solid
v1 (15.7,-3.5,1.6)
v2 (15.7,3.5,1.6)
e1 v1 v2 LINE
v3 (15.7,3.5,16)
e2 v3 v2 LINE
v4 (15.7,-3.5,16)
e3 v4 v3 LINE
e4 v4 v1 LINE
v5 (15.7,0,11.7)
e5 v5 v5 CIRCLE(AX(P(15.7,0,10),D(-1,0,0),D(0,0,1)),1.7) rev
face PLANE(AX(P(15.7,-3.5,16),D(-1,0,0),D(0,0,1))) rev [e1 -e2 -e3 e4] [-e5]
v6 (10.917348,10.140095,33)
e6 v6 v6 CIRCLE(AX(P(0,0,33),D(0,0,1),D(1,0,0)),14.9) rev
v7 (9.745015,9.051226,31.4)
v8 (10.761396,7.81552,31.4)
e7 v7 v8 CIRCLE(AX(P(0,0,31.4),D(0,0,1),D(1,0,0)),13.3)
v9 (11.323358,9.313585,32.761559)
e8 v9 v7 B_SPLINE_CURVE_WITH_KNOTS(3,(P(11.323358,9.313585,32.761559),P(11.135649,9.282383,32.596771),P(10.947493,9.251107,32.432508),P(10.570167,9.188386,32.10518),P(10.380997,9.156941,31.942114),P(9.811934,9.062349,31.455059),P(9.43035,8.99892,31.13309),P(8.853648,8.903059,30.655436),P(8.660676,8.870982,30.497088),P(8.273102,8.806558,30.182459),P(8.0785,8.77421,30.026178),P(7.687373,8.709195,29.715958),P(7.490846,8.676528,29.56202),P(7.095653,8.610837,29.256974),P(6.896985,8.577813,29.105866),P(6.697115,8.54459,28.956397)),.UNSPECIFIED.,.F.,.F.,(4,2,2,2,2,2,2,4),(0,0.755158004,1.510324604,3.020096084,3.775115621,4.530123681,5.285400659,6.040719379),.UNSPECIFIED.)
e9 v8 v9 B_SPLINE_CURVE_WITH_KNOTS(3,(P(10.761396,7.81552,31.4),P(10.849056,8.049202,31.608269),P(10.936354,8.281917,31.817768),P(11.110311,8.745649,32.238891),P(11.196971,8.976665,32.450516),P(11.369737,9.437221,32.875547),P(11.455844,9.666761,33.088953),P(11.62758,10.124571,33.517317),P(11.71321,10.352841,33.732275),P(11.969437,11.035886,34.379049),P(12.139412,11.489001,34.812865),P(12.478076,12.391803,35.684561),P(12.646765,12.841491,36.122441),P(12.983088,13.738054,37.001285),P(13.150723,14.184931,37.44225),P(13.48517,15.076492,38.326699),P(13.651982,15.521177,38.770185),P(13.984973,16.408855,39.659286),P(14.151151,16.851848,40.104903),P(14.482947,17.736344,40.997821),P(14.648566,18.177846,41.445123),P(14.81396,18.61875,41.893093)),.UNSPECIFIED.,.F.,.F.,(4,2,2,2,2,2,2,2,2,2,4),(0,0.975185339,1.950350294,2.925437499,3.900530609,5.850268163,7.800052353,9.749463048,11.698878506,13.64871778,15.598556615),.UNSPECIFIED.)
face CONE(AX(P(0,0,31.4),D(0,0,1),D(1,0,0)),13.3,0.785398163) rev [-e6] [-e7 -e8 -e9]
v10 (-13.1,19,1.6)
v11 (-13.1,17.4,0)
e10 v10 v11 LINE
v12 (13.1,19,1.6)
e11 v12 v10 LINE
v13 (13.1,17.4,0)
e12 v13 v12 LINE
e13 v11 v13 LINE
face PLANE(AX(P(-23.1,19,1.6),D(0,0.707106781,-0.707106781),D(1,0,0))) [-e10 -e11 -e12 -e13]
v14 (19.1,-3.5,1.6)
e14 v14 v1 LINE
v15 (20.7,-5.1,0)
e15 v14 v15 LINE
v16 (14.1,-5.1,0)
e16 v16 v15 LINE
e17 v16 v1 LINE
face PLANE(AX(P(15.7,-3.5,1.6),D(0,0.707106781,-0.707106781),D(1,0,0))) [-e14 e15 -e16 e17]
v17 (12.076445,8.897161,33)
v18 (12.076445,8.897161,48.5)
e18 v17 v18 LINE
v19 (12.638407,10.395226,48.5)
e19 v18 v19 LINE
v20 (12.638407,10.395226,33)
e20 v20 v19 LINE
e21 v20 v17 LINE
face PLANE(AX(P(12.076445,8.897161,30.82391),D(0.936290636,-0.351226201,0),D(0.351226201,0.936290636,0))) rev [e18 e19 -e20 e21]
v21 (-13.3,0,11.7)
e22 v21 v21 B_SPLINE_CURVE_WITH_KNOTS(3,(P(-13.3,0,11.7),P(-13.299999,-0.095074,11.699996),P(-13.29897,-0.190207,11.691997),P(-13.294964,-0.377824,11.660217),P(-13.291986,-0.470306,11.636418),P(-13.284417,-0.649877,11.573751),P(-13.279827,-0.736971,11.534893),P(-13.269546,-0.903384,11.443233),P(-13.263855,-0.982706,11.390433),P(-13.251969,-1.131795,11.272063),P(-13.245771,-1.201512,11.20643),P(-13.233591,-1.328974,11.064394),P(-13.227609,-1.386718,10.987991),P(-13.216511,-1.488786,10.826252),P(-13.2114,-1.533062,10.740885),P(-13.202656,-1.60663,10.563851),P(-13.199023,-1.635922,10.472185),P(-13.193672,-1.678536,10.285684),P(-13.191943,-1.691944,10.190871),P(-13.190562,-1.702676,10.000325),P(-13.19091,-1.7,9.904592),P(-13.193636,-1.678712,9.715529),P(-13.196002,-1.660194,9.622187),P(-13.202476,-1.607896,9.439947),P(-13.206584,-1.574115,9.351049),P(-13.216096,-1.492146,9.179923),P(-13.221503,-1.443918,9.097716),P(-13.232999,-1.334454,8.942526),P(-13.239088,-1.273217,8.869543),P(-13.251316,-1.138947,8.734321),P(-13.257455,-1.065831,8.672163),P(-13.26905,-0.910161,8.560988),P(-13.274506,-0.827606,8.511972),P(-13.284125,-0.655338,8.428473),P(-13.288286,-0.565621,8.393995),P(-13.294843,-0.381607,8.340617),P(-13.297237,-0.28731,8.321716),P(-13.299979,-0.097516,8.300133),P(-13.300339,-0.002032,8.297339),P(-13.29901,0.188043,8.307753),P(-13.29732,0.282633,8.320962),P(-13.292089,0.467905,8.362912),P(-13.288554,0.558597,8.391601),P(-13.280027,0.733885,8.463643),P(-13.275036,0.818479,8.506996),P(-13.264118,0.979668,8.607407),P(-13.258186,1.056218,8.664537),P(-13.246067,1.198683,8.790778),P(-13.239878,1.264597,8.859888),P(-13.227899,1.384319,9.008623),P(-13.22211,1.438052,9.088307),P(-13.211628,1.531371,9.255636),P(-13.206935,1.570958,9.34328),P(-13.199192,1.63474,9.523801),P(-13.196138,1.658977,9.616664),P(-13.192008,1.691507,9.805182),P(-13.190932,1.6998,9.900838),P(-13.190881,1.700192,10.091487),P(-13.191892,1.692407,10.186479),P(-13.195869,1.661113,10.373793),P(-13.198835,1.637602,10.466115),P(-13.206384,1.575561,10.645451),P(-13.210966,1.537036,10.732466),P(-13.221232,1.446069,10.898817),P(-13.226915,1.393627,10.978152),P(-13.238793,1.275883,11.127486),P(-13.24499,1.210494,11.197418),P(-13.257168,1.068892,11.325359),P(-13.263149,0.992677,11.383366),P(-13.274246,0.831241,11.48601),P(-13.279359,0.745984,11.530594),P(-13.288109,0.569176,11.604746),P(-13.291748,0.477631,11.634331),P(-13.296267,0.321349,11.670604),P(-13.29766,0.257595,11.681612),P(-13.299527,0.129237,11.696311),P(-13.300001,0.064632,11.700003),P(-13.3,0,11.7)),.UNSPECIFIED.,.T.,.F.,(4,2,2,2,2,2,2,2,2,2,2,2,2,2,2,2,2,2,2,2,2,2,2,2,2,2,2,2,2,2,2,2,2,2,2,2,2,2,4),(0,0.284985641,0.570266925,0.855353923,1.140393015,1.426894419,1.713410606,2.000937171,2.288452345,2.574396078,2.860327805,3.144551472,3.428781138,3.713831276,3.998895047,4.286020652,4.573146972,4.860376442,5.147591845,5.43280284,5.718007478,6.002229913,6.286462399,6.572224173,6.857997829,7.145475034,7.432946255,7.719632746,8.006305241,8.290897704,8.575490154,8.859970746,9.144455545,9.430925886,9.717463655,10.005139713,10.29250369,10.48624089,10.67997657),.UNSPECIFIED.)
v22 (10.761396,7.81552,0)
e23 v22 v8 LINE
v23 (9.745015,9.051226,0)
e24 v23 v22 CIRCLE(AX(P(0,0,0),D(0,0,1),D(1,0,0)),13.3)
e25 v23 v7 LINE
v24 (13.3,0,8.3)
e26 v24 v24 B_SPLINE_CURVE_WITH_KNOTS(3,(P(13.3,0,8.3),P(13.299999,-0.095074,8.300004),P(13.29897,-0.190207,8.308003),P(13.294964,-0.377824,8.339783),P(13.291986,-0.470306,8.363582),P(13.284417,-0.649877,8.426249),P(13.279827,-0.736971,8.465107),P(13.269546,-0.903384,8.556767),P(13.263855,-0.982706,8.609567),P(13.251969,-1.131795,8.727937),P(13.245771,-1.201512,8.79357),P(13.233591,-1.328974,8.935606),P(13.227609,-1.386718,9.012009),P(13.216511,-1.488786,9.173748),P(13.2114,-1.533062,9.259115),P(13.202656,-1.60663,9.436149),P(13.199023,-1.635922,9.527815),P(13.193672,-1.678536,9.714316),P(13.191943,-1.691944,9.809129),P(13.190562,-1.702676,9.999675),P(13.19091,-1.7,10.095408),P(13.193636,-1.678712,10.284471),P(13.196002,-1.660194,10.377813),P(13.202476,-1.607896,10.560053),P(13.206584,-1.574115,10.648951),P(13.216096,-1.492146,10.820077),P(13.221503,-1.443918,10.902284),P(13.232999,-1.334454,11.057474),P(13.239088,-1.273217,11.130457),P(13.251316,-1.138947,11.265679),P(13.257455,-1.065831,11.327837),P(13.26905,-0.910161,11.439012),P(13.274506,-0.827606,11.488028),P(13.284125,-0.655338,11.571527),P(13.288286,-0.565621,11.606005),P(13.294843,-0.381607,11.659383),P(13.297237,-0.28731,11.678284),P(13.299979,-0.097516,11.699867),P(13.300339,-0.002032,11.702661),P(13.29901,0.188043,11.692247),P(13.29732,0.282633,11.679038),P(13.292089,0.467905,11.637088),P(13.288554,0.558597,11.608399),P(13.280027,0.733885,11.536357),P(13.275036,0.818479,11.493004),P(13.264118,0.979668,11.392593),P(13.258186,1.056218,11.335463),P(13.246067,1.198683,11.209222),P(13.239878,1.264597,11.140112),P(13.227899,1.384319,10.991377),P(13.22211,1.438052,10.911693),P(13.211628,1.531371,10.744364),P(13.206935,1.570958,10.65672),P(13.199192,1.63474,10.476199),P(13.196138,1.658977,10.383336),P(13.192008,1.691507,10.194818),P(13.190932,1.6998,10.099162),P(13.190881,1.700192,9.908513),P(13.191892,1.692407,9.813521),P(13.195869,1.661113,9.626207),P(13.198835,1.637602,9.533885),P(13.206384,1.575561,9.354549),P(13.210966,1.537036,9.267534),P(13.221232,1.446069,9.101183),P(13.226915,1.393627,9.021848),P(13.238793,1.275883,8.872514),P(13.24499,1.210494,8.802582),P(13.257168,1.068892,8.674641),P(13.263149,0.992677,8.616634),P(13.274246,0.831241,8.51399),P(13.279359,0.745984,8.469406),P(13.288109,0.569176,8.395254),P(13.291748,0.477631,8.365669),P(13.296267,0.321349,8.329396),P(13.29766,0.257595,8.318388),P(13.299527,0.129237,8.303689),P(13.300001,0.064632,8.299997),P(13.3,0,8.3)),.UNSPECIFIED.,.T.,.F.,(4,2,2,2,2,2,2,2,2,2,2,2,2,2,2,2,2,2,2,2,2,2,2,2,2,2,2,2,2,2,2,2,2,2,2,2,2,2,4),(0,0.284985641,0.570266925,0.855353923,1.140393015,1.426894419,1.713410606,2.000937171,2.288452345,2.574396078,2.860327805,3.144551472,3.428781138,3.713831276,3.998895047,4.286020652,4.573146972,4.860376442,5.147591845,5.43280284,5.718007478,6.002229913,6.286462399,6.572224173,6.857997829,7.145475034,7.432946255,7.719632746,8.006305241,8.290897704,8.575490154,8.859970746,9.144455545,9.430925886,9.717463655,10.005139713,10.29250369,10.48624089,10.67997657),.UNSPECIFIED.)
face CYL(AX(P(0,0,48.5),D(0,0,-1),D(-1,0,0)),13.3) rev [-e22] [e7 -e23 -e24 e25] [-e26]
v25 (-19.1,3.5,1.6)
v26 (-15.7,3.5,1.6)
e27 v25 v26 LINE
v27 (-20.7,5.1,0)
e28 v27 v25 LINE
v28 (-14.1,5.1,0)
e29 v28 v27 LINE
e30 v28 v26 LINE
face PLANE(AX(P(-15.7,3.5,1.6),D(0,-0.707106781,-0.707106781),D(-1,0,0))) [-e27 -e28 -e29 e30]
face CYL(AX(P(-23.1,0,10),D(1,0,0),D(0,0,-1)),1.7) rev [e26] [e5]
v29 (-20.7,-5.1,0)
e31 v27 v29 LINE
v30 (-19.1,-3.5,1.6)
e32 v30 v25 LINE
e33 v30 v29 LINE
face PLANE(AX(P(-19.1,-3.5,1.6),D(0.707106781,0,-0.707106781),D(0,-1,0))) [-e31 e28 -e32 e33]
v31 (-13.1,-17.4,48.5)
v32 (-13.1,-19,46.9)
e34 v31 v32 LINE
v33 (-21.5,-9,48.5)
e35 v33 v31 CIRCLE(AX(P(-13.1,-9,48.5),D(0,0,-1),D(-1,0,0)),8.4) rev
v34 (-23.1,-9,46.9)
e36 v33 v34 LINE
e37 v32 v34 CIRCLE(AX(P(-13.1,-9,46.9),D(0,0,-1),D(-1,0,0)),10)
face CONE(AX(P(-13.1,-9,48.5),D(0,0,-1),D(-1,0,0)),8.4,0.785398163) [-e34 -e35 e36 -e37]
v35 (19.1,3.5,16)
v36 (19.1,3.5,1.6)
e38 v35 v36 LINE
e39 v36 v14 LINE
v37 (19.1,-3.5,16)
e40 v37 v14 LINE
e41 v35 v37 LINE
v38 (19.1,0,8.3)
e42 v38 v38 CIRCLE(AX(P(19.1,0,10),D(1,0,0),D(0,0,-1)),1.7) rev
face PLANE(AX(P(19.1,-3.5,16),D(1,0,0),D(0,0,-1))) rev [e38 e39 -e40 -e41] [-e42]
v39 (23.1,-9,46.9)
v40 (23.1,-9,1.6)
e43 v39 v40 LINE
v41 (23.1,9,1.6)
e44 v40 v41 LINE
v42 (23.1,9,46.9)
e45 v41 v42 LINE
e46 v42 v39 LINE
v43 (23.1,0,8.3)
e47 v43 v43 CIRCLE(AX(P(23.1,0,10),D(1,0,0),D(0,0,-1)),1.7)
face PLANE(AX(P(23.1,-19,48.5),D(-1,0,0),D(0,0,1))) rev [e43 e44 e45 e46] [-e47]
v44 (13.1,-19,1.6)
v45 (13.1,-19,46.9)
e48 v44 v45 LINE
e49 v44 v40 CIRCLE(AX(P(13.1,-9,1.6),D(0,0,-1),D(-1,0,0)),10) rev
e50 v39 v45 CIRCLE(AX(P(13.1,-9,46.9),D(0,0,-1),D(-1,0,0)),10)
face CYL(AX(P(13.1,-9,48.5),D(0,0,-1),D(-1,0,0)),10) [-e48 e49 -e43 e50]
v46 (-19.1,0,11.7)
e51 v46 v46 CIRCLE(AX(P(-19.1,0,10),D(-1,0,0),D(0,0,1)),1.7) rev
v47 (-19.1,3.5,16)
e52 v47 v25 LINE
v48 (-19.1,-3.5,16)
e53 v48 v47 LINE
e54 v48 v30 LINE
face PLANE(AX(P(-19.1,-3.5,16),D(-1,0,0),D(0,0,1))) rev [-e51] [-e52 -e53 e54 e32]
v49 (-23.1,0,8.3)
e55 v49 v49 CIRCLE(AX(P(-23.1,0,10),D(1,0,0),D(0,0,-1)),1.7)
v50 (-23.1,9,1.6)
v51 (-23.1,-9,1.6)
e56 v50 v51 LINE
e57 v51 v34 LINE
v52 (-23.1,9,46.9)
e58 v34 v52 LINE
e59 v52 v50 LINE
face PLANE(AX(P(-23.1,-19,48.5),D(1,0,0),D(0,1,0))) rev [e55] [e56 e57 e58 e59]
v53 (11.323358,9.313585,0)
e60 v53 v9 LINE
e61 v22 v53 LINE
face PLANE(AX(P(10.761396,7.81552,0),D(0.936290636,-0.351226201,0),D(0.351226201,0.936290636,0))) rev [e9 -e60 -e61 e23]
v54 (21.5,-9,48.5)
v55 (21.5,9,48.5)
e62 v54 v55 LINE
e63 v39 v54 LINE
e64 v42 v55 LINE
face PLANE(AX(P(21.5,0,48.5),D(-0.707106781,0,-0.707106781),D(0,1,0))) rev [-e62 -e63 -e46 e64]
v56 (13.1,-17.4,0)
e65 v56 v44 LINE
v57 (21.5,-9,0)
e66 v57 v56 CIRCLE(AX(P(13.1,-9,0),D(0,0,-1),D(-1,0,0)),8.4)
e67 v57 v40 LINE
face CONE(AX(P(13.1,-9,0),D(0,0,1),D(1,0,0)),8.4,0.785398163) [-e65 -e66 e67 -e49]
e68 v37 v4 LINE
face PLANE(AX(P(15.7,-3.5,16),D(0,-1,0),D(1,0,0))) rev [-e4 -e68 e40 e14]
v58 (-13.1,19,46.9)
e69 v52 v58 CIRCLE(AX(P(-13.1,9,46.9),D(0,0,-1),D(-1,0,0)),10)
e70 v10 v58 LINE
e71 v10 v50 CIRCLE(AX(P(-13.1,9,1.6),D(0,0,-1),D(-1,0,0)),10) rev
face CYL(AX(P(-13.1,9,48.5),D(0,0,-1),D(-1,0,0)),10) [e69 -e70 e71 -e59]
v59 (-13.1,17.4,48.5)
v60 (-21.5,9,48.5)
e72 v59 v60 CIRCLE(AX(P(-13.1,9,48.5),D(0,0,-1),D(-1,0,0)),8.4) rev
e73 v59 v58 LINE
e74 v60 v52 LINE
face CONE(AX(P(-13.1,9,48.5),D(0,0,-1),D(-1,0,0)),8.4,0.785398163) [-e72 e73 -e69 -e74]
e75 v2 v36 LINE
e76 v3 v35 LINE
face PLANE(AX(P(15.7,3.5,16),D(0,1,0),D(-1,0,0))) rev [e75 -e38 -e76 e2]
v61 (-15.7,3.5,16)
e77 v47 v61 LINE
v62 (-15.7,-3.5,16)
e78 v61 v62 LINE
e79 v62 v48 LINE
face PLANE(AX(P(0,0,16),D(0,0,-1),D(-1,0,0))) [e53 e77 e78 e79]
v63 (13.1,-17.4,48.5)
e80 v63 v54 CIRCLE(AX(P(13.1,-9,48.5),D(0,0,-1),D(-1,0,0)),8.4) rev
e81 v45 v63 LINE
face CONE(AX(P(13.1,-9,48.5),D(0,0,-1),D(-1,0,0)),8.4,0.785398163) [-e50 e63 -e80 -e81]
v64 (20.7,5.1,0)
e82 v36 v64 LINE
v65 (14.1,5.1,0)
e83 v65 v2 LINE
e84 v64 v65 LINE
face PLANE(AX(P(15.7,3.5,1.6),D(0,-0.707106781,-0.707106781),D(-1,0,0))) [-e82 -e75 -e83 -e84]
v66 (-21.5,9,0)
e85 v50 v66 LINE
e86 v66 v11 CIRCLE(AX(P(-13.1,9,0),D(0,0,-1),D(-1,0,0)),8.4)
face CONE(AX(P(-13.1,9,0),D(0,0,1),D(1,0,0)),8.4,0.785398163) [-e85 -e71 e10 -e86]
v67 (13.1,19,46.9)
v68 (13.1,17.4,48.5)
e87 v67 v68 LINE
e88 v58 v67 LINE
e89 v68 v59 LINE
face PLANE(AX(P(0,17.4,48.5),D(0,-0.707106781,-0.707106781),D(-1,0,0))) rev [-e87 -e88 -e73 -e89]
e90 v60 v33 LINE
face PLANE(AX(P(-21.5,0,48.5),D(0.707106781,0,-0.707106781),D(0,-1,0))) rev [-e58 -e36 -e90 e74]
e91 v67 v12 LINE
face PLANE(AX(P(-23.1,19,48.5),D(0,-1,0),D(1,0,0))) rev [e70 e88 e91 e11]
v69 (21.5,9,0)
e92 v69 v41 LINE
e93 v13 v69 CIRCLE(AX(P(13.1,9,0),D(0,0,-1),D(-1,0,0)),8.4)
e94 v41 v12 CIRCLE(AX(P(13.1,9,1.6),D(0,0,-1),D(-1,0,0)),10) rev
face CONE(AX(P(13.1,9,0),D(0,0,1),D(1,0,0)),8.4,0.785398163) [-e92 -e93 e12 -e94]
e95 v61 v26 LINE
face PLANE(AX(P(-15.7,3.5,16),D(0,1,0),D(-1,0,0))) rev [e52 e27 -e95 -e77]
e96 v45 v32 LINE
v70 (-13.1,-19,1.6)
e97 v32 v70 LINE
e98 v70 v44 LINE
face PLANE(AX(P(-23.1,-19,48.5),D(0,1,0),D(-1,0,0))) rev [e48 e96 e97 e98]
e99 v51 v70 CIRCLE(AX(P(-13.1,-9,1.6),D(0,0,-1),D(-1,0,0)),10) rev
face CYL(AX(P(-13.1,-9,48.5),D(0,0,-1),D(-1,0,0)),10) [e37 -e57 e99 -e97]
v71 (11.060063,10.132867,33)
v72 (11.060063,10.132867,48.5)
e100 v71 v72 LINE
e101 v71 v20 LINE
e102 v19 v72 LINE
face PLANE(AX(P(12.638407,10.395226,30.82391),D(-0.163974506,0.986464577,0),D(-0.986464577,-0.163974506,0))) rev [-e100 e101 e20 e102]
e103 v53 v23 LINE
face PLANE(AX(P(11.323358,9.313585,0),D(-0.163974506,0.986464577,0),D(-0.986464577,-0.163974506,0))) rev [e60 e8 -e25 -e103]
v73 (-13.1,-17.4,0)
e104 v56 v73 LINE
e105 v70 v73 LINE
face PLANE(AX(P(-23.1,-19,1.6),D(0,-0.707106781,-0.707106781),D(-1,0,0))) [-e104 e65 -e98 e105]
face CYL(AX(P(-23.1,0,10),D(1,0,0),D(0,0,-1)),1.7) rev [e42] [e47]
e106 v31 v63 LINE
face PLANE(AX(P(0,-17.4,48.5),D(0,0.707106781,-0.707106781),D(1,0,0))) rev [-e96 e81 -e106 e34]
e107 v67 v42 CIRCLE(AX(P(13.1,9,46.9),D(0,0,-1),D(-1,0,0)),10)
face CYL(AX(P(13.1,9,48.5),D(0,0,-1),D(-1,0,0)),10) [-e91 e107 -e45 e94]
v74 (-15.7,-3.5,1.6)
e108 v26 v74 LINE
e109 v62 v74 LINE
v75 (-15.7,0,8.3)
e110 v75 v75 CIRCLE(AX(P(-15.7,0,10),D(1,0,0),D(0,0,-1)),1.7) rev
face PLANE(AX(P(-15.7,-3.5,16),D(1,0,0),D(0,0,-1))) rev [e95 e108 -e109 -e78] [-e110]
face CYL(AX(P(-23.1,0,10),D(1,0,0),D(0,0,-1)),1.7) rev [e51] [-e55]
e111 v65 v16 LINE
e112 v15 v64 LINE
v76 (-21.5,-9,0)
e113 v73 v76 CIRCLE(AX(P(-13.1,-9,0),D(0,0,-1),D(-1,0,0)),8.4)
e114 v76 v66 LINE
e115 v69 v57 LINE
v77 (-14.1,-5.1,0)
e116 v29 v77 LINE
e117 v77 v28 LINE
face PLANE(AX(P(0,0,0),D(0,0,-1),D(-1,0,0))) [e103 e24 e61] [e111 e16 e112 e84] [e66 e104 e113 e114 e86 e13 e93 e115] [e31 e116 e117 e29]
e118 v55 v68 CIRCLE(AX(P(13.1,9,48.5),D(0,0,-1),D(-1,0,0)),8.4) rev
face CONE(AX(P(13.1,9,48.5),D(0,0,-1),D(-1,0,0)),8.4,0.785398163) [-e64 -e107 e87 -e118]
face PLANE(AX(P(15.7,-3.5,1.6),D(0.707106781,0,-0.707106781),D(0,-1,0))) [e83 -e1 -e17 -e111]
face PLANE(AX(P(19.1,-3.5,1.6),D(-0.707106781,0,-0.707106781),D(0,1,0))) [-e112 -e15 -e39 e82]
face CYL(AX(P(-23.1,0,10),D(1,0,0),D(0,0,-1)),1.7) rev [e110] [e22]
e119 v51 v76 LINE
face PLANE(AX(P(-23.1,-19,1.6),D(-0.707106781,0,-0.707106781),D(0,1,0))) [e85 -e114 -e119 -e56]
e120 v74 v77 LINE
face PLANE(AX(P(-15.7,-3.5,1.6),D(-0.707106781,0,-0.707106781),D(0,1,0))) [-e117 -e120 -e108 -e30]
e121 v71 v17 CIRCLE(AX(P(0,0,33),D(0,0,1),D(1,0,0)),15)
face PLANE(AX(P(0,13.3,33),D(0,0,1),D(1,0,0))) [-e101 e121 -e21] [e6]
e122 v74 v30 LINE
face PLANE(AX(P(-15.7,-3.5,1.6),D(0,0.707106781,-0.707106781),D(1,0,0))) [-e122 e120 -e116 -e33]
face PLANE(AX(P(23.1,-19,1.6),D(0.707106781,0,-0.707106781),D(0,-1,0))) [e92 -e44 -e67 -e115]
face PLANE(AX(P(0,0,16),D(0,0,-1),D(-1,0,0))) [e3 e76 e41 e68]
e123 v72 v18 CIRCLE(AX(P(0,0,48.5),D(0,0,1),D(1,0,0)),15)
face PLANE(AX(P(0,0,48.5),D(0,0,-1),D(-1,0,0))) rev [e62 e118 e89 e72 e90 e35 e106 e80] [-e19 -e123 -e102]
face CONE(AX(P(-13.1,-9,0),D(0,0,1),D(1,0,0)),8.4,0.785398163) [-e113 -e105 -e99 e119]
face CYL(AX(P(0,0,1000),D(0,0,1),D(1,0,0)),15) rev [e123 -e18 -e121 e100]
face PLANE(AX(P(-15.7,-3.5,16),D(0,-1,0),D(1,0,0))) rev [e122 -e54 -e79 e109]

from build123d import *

# Parameters (mm, degrees)
SKETCH2_W           = 46.2
SKETCH2_H           = 38
SKETCH2_R           = 13.3
BOSS_EXTRUDE1_DEPTH = 48.5
SKETCH3_R           = 1.7
CUT_EXTRUDE1_DEPTH  = 70.625354577
SKETCH4_W           = 3.4
SKETCH4_H           = 7
CUT_EXTRUDE2_DEPTH  = 16
CUT_EXTRUDE3_DEPTH  = 15.5
CUT_EXTRUDE4_DEPTH  = 45.537736882
FILLET1_R           = 10
CHAMFER1_SIZE       = 1.6
CHAMFER2_SIZE       = 1.6
CHAMFER3_SIZE       = 1.6
CHAMFER4_SIZE       = 1.6


with BuildPart() as part:
    # Sketch2 → Boss-Extrude1 (new body)
    with BuildSketch(Plane.XY):
        Rectangle(SKETCH2_W, SKETCH2_H)
        with Locations(Location((0, 0, 0), (0, 0, 180))):
            Circle(SKETCH2_R, mode=Mode.SUBTRACT)
    extrude(amount=BOSS_EXTRUDE1_DEPTH)

    # Sketch3 → Cut-Extrude1 (cut, through all)
    with BuildSketch(Plane(origin=(23.1, 0, 0), x_dir=(0, 0, -1), z_dir=(1, 0, 0))):
        with Locations((-10, 0)):
            Circle(SKETCH3_R)
    extrude(amount=-CUT_EXTRUDE1_DEPTH, mode=Mode.SUBTRACT)

    # Sketch4 → Cut-Extrude2 (cut)
    with BuildSketch(Plane(origin=(0, 0, 0), x_dir=(-1, 0, 0), z_dir=(0, 0, -1))):
        with Locations((-17.4, 0)):
            Rectangle(SKETCH4_W, SKETCH4_H)
        with Locations((17.4, 0)):
            Rectangle(SKETCH4_W, SKETCH4_H)
    extrude(amount=-CUT_EXTRUDE2_DEPTH, mode=Mode.SUBTRACT)

    # Sketch1 → Cut-Revolve1 (revolve, cut)
    with BuildSketch(Plane(origin=(0, 0, 0), x_dir=(0, 0, -1), z_dir=(1, 0, 0)), mode=Mode.PRIVATE) as cut_revolve1_sk:
        Polygon((0, 0), (0, 13.3), (-33, 13.3), (-33, 15), (-48.5, 15), (-48.5, 0), align=None)
    revolve(cut_revolve1_sk.sketch.rotate(Axis((0, 0, 1000), (0, 0, -1)), 90), axis=Axis((0, 0, 1000), (0, 0, -1)), mode=Mode.SUBTRACT)

    # Sketch5 → Cut-Extrude3 (cut)
    with BuildSketch(Plane.XY.offset(48.5)):
        Polygon((12.638406773, 10.39522635), (11.06006345, 10.132867141), (12.076444851, 8.897161332), align=None)
    extrude(amount=-CUT_EXTRUDE3_DEPTH, mode=Mode.SUBTRACT)

    # Sketch6 → Cut-Extrude4 (cut, through all)
    with BuildSketch(Plane.XY.offset(33)):
        Polygon((11.32335828, 9.313584733), (9.745014957, 9.051225524), (10.761396359, 7.815519715), align=None)
    extrude(amount=-CUT_EXTRUDE4_DEPTH, mode=Mode.SUBTRACT)

    # Fillet1
    fillet1_edges = [part.edges().sort_by_distance(p)[0] for p in [
        (23.1, -19, 24.25),
        (-23.1, -19, 24.25),
        (-23.1, 19, 24.25),
        (23.1, 19, 24.25),
    ]]
    fillet(fillet1_edges, radius=FILLET1_R)

    # Chamfer1
    chamfer1_edges = [part.edges().sort_by_distance(p)[0] for p in [
        (0, 19, 48.5),
        (-23.1, 0, 48.5),
        (20.171067812, 16.071067812, 48.5),
        (-20.171067812, 16.071067812, 48.5),
        (-20.171067812, -16.071067812, 48.5),
        (20.171067812, -16.071067812, 48.5),
        (23.1, 0, 48.5),
        (0, -19, 48.5),
    ]]
    chamfer(chamfer1_edges, length=CHAMFER1_SIZE)

    # Chamfer2
    # the kernel refuses this chamfer: 1.6 mm, written as the material it takes off along each edge
    with BuildSketch(Plane(origin=(0, 0, 33), x_dir=(-1, 0, 0), z_dir=(0, 1, 0))) as chamfer2_piece_1:
        Polygon((13.3, -CHAMFER2_SIZE), (13.3 + CHAMFER2_SIZE, 0), (13.3, 0), align=None)
    revolve(axis=Axis((0, 0, 33), (0, 0, 1)), revolution_arc=233.756192623, mode=Mode.SUBTRACT)
    with BuildSketch(Plane(origin=(0, 0, 33), x_dir=(0.905245194595796, 0.42488955936951367, 0), z_dir=(0.42488955936951367, -0.905245194595796, 0))) as chamfer2_piece_2:
        Polygon((13.3, -CHAMFER2_SIZE), (13.3 + CHAMFER2_SIZE, 0), (13.3, 0), align=None)
    revolve(axis=Axis((0, 0, 33), (0, 0, 1)), revolution_arc=154.856326918, mode=Mode.SUBTRACT)

    # Chamfer3
    chamfer3_edges = [part.edges().sort_by_distance(p)[0] for p in [
        (15.7, 0, 0),
        (17.4, 3.5, 0),
        (19.1, 0, 0),
        (17.4, -3.5, 0),
        (-17.4, -3.5, 0),
        (-19.1, 0, 0),
        (-17.4, 3.5, 0),
        (-15.7, 0, 0),
    ]]
    chamfer(chamfer3_edges, length=CHAMFER3_SIZE)

    # Chamfer4
    chamfer4_edges = [part.edges().sort_by_distance(p)[0] for p in [
        (23.1, 0, 0),
        (0, -19, 0),
        (-23.1, 0, 0),
        (0, 19, 0),
        (20.171067812, 16.071067812, 0),
        (-20.171067812, 16.071067812, 0),
        (-20.171067812, -16.071067812, 0),
        (20.171067812, -16.071067812, 0),
    ]]
    chamfer(chamfer4_edges, length=CHAMFER4_SIZE)


solid = part.part
